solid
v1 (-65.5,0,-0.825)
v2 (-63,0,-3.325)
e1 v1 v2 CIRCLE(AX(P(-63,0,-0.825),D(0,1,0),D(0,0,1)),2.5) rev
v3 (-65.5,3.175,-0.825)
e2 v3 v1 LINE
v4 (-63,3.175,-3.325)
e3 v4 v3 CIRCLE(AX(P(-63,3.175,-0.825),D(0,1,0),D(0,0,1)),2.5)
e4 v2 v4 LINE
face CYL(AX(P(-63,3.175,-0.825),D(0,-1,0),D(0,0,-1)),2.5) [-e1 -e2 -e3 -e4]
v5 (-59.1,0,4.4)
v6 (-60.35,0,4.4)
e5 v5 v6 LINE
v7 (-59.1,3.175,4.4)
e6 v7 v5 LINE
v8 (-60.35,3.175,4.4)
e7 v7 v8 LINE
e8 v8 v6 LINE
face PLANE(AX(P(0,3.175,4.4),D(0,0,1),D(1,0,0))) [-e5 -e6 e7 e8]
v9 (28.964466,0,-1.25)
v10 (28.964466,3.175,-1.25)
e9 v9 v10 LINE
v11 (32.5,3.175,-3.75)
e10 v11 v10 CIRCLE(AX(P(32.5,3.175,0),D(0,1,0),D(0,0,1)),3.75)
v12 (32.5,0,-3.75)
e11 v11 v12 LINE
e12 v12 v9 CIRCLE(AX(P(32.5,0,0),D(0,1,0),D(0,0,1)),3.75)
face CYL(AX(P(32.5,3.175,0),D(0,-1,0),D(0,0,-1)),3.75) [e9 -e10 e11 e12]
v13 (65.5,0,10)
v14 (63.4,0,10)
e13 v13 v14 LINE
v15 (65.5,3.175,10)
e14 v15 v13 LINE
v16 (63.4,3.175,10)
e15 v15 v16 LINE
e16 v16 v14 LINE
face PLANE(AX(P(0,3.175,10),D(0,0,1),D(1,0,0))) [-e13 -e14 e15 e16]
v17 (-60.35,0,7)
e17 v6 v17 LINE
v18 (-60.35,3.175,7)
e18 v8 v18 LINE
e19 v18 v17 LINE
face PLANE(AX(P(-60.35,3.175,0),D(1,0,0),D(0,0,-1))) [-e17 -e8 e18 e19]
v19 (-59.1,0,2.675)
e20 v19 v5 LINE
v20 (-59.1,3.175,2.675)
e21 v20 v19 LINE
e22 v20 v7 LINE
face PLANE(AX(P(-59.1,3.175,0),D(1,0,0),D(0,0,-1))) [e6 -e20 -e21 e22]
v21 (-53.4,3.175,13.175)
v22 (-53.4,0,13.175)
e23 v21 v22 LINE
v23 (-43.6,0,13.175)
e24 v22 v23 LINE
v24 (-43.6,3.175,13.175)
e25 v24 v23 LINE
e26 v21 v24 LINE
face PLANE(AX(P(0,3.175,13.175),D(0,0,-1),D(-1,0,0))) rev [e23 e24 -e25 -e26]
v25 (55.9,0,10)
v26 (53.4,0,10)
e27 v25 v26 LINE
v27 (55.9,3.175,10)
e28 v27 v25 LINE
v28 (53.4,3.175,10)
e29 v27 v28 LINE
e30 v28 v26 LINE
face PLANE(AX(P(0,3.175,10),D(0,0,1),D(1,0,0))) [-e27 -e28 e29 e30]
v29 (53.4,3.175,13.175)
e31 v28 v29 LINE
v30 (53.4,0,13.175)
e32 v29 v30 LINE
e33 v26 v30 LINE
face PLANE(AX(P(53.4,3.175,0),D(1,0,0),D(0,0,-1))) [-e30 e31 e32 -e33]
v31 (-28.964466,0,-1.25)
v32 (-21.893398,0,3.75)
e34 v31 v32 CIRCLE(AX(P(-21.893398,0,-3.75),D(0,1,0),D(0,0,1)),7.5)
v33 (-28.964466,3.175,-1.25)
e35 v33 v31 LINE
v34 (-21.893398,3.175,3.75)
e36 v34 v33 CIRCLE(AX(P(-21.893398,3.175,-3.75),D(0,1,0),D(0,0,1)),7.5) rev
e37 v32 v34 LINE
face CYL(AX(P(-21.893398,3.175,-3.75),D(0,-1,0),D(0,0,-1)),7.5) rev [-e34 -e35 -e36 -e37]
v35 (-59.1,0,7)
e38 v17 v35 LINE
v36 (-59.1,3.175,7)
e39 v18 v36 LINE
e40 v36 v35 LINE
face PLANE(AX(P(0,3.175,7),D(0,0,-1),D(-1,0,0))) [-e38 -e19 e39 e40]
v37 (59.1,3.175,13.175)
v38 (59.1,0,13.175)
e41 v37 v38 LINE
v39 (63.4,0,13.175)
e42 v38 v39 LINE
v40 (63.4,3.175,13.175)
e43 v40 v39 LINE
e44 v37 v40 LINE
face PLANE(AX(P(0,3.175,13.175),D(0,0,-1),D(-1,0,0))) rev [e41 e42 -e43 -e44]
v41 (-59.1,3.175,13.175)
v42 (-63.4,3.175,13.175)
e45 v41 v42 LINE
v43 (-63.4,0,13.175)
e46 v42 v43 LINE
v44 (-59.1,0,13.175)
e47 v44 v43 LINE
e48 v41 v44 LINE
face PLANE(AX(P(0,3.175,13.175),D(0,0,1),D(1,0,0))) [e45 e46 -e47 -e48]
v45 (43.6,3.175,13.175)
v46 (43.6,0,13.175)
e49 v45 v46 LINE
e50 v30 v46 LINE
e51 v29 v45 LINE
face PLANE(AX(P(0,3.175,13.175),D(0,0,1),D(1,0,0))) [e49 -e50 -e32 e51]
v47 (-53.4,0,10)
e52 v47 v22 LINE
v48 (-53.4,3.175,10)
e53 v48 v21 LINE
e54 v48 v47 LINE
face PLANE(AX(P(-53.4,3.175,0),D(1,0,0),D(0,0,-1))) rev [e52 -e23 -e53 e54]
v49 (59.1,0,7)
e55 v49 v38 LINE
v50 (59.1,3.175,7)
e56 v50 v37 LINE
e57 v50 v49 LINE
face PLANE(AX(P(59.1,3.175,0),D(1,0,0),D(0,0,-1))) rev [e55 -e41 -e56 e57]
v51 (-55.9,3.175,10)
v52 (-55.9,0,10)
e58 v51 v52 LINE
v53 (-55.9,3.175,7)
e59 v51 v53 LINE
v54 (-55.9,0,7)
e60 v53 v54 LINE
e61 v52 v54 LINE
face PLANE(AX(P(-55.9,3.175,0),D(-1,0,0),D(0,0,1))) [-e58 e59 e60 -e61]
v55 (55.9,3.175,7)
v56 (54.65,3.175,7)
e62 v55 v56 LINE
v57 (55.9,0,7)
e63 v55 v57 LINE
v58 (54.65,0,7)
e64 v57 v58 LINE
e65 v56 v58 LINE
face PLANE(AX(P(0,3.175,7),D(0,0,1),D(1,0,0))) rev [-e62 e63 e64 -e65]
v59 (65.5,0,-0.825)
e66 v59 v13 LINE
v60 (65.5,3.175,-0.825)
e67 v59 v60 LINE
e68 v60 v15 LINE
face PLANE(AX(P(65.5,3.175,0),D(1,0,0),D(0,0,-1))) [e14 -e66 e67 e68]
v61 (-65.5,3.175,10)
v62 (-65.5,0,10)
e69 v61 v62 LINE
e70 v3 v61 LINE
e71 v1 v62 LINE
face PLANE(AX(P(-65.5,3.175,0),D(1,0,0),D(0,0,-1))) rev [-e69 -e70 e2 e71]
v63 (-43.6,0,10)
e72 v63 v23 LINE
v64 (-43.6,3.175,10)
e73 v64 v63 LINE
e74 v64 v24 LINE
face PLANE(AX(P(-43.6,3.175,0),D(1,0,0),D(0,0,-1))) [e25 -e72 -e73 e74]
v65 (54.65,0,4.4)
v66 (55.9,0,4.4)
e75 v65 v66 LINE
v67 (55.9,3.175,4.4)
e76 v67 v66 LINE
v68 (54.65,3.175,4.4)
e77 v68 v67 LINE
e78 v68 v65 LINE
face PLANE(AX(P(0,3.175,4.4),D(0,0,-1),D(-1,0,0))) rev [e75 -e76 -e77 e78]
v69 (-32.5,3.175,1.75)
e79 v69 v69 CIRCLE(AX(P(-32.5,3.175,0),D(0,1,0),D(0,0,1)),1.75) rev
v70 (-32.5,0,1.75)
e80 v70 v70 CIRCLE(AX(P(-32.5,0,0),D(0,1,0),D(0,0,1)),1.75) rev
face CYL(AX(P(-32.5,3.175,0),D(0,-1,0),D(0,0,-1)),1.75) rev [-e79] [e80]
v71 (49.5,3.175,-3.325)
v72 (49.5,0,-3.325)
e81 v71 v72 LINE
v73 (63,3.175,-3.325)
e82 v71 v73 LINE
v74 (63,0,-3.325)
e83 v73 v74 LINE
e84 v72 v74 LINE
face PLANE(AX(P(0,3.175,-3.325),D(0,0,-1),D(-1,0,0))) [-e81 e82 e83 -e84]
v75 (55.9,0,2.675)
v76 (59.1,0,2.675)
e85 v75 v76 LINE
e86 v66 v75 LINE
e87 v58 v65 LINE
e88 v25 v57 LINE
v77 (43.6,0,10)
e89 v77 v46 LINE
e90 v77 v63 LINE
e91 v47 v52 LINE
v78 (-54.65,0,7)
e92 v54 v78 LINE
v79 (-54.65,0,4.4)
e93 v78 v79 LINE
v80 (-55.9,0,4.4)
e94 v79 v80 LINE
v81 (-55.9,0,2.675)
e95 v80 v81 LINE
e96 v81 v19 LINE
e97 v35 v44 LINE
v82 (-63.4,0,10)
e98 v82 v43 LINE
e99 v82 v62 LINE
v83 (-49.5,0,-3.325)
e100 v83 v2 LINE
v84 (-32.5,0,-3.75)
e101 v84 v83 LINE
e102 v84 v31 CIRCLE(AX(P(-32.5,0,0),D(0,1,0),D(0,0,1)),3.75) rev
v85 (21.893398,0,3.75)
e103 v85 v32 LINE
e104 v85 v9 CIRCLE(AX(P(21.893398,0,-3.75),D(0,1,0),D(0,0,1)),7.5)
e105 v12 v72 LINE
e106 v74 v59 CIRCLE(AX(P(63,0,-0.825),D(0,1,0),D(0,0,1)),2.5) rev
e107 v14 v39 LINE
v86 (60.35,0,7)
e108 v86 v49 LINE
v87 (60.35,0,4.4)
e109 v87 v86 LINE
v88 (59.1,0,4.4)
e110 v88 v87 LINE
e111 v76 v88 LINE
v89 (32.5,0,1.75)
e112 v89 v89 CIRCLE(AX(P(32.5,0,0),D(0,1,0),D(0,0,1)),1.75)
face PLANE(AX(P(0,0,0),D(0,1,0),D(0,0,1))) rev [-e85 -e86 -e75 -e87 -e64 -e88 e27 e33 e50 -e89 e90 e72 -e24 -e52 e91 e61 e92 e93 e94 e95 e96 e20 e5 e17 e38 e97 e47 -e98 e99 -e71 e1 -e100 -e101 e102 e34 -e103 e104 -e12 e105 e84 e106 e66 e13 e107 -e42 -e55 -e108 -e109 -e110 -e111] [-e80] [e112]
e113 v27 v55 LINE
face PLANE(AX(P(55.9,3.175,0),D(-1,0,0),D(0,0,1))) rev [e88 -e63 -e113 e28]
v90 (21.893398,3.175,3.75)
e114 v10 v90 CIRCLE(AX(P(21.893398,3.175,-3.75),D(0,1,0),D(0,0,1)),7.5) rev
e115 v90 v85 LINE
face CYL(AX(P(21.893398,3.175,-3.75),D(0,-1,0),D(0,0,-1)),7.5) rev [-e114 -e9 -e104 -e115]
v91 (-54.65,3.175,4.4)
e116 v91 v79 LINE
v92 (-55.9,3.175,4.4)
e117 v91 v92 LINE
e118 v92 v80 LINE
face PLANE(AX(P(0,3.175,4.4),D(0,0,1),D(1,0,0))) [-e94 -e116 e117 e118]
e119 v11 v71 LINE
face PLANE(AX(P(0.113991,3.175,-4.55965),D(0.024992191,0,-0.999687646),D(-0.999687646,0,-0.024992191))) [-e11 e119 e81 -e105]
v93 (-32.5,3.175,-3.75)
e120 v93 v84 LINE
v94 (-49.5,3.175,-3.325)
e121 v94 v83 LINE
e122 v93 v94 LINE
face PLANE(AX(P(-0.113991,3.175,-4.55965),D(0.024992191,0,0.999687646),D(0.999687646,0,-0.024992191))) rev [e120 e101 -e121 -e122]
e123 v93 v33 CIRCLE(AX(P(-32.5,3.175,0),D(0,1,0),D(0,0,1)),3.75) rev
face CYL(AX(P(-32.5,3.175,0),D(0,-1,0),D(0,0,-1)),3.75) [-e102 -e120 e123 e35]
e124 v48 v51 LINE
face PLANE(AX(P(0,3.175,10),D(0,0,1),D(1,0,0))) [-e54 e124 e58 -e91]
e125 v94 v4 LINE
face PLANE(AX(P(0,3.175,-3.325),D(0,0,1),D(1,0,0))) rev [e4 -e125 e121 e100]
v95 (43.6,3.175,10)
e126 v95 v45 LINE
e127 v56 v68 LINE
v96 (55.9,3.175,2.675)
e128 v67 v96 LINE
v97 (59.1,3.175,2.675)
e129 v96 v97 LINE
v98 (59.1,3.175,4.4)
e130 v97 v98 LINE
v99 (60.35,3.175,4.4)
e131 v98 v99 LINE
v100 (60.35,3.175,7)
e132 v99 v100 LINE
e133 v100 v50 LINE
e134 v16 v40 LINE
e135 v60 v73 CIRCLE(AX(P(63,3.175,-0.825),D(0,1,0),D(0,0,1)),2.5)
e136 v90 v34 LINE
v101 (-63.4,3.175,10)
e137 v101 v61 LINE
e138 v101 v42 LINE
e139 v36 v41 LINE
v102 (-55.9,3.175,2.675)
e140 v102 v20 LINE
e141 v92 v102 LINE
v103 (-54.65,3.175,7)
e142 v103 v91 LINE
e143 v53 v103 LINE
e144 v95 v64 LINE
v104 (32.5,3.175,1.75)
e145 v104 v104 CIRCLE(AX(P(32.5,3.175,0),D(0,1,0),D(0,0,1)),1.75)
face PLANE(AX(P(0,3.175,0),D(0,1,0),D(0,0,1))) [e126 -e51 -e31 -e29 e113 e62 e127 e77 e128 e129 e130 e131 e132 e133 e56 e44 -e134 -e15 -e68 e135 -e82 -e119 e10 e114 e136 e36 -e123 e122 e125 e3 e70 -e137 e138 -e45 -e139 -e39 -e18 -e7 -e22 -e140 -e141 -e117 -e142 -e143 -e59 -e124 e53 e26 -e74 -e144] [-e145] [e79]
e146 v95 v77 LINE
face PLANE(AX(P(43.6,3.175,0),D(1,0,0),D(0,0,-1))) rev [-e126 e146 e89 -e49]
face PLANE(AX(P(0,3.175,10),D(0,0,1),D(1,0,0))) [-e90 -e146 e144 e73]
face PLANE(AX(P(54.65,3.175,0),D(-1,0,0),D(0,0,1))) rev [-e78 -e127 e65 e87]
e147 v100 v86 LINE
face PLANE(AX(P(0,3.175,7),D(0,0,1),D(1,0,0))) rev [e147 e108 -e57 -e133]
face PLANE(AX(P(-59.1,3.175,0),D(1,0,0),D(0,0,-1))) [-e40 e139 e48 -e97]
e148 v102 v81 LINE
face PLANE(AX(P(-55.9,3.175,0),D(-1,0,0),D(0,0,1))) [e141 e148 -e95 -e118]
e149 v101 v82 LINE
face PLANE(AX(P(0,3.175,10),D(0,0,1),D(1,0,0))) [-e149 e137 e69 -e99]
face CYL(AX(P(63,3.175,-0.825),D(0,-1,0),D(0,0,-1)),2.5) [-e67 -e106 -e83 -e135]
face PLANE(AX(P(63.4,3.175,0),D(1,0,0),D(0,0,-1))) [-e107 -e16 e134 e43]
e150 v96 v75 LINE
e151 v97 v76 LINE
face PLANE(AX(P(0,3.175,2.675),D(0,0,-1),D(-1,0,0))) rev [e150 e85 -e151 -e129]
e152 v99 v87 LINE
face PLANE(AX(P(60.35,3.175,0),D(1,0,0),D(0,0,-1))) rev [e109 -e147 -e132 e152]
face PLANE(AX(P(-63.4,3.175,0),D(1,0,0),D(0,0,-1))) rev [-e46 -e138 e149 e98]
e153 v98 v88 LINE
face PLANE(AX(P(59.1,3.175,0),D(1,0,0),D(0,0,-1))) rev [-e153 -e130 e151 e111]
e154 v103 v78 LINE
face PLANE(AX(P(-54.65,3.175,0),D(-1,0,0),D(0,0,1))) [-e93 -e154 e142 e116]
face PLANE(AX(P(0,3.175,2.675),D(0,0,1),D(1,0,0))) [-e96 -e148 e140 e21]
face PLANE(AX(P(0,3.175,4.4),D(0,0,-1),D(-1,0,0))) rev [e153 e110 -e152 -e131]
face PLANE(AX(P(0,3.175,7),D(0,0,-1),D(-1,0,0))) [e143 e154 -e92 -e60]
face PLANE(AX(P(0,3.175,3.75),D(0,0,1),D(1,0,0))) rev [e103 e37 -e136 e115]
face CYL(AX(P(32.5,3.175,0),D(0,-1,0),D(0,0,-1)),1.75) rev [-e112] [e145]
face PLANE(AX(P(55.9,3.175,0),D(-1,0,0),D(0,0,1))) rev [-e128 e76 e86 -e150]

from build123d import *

# Parameters (mm, degrees)
SKETCH1_R           = 1.75
BOSS_EXTRUDE1_DEPTH = 3.175
FILLET1_R           = 7.5
FILLET2_R           = 2.5


with BuildPart() as part:
    # Sketch1 → Boss-Extrude1 (new body)
    with BuildSketch(Plane(origin=(0, 0, 0), x_dir=(1, 0, 0), z_dir=(0, 1, 0))):
        with BuildLine():
            Line((65.5, 3.325), (49.5, 3.325))
            Line((49.5, 3.325), (32.5, 3.75))
            ThreePointArc((32.5, 3.75), (29.848349571, 2.651650429), (28.75, 0))
            Line((28.75, 0), (28.75, -3.75))
            Line((28.75, -3.75), (-28.75, -3.75))
            Line((-28.75, -3.75), (-28.75, 0))
            ThreePointArc((-28.75, 0), (-29.848349571, 2.651650429), (-32.5, 3.75))
            Line((-32.5, 3.75), (-49.5, 3.325))
            Line((-49.5, 3.325), (-65.5, 3.325))
            Line((-65.5, 3.325), (-65.5, -10))
            Line((-65.5, -10), (-63.4, -10))
            Line((-63.4, -10), (-63.4, -13.175))
            Line((-63.4, -13.175), (-59.1, -13.175))
            Line((-59.1, -13.175), (-59.1, -7))
            Line((-59.1, -7), (-60.35, -7))
            Line((-60.35, -7), (-60.35, -4.4))
            Line((-60.35, -4.4), (-59.1, -4.4))
            Line((-59.1, -4.4), (-59.1, -2.675))
            Line((-59.1, -2.675), (-55.9, -2.675))
            Line((-55.9, -2.675), (-55.9, -4.4))
            Line((-55.9, -4.4), (-54.65, -4.4))
            Line((-54.65, -4.4), (-54.65, -7))
            Line((-54.65, -7), (-55.9, -7))
            Line((-55.9, -7), (-55.9, -10))
            Line((-55.9, -10), (-53.4, -10))
            Line((-53.4, -10), (-53.4, -13.175))
            Line((-53.4, -13.175), (-43.6, -13.175))
            Line((-43.6, -13.175), (-43.6, -10))
            Line((-43.6, -10), (43.6, -10))
            Line((43.6, -10), (43.6, -13.175))
            Line((43.6, -13.175), (53.4, -13.175))
            Line((53.4, -13.175), (53.4, -10))
            Line((53.4, -10), (55.9, -10))
            Line((55.9, -10), (55.9, -7))
            Line((55.9, -7), (54.65, -7))
            Line((54.65, -7), (54.65, -4.4))
            Line((54.65, -4.4), (55.9, -4.4))
            Line((55.9, -4.4), (55.9, -2.675))
            Line((55.9, -2.675), (59.1, -2.675))
            Line((59.1, -2.675), (59.1, -4.4))
            Line((59.1, -4.4), (60.35, -4.4))
            Line((60.35, -4.4), (60.35, -7))
            Line((60.35, -7), (59.1, -7))
            Line((59.1, -7), (59.1, -13.175))
            Line((59.1, -13.175), (63.4, -13.175))
            Line((63.4, -13.175), (63.4, -10))
            Line((63.4, -10), (65.5, -10))
            Line((65.5, -10), (65.5, 3.325))
        make_face()
        with Locations((32.5, 0)):
            Circle(SKETCH1_R, mode=Mode.SUBTRACT)
        with Locations((-32.5, 0)):
            Circle(SKETCH1_R, mode=Mode.SUBTRACT)
    extrude(amount=BOSS_EXTRUDE1_DEPTH)

    # Fillet1
    fillet1_edges = [part.edges().sort_by_distance(p)[0] for p in [
        (-28.75, 1.5875, 3.75),
        (28.75, 1.5875, 3.75),
    ]]
    fillet(fillet1_edges, radius=FILLET1_R)

    # Fillet2
    fillet2_edges = [part.edges().sort_by_distance(p)[0] for p in [
        (-65.5, 1.5875, -3.325),
        (65.5, 1.5875, -3.325),
    ]]
    fillet(fillet2_edges, radius=FILLET2_R)


solid = part.part
